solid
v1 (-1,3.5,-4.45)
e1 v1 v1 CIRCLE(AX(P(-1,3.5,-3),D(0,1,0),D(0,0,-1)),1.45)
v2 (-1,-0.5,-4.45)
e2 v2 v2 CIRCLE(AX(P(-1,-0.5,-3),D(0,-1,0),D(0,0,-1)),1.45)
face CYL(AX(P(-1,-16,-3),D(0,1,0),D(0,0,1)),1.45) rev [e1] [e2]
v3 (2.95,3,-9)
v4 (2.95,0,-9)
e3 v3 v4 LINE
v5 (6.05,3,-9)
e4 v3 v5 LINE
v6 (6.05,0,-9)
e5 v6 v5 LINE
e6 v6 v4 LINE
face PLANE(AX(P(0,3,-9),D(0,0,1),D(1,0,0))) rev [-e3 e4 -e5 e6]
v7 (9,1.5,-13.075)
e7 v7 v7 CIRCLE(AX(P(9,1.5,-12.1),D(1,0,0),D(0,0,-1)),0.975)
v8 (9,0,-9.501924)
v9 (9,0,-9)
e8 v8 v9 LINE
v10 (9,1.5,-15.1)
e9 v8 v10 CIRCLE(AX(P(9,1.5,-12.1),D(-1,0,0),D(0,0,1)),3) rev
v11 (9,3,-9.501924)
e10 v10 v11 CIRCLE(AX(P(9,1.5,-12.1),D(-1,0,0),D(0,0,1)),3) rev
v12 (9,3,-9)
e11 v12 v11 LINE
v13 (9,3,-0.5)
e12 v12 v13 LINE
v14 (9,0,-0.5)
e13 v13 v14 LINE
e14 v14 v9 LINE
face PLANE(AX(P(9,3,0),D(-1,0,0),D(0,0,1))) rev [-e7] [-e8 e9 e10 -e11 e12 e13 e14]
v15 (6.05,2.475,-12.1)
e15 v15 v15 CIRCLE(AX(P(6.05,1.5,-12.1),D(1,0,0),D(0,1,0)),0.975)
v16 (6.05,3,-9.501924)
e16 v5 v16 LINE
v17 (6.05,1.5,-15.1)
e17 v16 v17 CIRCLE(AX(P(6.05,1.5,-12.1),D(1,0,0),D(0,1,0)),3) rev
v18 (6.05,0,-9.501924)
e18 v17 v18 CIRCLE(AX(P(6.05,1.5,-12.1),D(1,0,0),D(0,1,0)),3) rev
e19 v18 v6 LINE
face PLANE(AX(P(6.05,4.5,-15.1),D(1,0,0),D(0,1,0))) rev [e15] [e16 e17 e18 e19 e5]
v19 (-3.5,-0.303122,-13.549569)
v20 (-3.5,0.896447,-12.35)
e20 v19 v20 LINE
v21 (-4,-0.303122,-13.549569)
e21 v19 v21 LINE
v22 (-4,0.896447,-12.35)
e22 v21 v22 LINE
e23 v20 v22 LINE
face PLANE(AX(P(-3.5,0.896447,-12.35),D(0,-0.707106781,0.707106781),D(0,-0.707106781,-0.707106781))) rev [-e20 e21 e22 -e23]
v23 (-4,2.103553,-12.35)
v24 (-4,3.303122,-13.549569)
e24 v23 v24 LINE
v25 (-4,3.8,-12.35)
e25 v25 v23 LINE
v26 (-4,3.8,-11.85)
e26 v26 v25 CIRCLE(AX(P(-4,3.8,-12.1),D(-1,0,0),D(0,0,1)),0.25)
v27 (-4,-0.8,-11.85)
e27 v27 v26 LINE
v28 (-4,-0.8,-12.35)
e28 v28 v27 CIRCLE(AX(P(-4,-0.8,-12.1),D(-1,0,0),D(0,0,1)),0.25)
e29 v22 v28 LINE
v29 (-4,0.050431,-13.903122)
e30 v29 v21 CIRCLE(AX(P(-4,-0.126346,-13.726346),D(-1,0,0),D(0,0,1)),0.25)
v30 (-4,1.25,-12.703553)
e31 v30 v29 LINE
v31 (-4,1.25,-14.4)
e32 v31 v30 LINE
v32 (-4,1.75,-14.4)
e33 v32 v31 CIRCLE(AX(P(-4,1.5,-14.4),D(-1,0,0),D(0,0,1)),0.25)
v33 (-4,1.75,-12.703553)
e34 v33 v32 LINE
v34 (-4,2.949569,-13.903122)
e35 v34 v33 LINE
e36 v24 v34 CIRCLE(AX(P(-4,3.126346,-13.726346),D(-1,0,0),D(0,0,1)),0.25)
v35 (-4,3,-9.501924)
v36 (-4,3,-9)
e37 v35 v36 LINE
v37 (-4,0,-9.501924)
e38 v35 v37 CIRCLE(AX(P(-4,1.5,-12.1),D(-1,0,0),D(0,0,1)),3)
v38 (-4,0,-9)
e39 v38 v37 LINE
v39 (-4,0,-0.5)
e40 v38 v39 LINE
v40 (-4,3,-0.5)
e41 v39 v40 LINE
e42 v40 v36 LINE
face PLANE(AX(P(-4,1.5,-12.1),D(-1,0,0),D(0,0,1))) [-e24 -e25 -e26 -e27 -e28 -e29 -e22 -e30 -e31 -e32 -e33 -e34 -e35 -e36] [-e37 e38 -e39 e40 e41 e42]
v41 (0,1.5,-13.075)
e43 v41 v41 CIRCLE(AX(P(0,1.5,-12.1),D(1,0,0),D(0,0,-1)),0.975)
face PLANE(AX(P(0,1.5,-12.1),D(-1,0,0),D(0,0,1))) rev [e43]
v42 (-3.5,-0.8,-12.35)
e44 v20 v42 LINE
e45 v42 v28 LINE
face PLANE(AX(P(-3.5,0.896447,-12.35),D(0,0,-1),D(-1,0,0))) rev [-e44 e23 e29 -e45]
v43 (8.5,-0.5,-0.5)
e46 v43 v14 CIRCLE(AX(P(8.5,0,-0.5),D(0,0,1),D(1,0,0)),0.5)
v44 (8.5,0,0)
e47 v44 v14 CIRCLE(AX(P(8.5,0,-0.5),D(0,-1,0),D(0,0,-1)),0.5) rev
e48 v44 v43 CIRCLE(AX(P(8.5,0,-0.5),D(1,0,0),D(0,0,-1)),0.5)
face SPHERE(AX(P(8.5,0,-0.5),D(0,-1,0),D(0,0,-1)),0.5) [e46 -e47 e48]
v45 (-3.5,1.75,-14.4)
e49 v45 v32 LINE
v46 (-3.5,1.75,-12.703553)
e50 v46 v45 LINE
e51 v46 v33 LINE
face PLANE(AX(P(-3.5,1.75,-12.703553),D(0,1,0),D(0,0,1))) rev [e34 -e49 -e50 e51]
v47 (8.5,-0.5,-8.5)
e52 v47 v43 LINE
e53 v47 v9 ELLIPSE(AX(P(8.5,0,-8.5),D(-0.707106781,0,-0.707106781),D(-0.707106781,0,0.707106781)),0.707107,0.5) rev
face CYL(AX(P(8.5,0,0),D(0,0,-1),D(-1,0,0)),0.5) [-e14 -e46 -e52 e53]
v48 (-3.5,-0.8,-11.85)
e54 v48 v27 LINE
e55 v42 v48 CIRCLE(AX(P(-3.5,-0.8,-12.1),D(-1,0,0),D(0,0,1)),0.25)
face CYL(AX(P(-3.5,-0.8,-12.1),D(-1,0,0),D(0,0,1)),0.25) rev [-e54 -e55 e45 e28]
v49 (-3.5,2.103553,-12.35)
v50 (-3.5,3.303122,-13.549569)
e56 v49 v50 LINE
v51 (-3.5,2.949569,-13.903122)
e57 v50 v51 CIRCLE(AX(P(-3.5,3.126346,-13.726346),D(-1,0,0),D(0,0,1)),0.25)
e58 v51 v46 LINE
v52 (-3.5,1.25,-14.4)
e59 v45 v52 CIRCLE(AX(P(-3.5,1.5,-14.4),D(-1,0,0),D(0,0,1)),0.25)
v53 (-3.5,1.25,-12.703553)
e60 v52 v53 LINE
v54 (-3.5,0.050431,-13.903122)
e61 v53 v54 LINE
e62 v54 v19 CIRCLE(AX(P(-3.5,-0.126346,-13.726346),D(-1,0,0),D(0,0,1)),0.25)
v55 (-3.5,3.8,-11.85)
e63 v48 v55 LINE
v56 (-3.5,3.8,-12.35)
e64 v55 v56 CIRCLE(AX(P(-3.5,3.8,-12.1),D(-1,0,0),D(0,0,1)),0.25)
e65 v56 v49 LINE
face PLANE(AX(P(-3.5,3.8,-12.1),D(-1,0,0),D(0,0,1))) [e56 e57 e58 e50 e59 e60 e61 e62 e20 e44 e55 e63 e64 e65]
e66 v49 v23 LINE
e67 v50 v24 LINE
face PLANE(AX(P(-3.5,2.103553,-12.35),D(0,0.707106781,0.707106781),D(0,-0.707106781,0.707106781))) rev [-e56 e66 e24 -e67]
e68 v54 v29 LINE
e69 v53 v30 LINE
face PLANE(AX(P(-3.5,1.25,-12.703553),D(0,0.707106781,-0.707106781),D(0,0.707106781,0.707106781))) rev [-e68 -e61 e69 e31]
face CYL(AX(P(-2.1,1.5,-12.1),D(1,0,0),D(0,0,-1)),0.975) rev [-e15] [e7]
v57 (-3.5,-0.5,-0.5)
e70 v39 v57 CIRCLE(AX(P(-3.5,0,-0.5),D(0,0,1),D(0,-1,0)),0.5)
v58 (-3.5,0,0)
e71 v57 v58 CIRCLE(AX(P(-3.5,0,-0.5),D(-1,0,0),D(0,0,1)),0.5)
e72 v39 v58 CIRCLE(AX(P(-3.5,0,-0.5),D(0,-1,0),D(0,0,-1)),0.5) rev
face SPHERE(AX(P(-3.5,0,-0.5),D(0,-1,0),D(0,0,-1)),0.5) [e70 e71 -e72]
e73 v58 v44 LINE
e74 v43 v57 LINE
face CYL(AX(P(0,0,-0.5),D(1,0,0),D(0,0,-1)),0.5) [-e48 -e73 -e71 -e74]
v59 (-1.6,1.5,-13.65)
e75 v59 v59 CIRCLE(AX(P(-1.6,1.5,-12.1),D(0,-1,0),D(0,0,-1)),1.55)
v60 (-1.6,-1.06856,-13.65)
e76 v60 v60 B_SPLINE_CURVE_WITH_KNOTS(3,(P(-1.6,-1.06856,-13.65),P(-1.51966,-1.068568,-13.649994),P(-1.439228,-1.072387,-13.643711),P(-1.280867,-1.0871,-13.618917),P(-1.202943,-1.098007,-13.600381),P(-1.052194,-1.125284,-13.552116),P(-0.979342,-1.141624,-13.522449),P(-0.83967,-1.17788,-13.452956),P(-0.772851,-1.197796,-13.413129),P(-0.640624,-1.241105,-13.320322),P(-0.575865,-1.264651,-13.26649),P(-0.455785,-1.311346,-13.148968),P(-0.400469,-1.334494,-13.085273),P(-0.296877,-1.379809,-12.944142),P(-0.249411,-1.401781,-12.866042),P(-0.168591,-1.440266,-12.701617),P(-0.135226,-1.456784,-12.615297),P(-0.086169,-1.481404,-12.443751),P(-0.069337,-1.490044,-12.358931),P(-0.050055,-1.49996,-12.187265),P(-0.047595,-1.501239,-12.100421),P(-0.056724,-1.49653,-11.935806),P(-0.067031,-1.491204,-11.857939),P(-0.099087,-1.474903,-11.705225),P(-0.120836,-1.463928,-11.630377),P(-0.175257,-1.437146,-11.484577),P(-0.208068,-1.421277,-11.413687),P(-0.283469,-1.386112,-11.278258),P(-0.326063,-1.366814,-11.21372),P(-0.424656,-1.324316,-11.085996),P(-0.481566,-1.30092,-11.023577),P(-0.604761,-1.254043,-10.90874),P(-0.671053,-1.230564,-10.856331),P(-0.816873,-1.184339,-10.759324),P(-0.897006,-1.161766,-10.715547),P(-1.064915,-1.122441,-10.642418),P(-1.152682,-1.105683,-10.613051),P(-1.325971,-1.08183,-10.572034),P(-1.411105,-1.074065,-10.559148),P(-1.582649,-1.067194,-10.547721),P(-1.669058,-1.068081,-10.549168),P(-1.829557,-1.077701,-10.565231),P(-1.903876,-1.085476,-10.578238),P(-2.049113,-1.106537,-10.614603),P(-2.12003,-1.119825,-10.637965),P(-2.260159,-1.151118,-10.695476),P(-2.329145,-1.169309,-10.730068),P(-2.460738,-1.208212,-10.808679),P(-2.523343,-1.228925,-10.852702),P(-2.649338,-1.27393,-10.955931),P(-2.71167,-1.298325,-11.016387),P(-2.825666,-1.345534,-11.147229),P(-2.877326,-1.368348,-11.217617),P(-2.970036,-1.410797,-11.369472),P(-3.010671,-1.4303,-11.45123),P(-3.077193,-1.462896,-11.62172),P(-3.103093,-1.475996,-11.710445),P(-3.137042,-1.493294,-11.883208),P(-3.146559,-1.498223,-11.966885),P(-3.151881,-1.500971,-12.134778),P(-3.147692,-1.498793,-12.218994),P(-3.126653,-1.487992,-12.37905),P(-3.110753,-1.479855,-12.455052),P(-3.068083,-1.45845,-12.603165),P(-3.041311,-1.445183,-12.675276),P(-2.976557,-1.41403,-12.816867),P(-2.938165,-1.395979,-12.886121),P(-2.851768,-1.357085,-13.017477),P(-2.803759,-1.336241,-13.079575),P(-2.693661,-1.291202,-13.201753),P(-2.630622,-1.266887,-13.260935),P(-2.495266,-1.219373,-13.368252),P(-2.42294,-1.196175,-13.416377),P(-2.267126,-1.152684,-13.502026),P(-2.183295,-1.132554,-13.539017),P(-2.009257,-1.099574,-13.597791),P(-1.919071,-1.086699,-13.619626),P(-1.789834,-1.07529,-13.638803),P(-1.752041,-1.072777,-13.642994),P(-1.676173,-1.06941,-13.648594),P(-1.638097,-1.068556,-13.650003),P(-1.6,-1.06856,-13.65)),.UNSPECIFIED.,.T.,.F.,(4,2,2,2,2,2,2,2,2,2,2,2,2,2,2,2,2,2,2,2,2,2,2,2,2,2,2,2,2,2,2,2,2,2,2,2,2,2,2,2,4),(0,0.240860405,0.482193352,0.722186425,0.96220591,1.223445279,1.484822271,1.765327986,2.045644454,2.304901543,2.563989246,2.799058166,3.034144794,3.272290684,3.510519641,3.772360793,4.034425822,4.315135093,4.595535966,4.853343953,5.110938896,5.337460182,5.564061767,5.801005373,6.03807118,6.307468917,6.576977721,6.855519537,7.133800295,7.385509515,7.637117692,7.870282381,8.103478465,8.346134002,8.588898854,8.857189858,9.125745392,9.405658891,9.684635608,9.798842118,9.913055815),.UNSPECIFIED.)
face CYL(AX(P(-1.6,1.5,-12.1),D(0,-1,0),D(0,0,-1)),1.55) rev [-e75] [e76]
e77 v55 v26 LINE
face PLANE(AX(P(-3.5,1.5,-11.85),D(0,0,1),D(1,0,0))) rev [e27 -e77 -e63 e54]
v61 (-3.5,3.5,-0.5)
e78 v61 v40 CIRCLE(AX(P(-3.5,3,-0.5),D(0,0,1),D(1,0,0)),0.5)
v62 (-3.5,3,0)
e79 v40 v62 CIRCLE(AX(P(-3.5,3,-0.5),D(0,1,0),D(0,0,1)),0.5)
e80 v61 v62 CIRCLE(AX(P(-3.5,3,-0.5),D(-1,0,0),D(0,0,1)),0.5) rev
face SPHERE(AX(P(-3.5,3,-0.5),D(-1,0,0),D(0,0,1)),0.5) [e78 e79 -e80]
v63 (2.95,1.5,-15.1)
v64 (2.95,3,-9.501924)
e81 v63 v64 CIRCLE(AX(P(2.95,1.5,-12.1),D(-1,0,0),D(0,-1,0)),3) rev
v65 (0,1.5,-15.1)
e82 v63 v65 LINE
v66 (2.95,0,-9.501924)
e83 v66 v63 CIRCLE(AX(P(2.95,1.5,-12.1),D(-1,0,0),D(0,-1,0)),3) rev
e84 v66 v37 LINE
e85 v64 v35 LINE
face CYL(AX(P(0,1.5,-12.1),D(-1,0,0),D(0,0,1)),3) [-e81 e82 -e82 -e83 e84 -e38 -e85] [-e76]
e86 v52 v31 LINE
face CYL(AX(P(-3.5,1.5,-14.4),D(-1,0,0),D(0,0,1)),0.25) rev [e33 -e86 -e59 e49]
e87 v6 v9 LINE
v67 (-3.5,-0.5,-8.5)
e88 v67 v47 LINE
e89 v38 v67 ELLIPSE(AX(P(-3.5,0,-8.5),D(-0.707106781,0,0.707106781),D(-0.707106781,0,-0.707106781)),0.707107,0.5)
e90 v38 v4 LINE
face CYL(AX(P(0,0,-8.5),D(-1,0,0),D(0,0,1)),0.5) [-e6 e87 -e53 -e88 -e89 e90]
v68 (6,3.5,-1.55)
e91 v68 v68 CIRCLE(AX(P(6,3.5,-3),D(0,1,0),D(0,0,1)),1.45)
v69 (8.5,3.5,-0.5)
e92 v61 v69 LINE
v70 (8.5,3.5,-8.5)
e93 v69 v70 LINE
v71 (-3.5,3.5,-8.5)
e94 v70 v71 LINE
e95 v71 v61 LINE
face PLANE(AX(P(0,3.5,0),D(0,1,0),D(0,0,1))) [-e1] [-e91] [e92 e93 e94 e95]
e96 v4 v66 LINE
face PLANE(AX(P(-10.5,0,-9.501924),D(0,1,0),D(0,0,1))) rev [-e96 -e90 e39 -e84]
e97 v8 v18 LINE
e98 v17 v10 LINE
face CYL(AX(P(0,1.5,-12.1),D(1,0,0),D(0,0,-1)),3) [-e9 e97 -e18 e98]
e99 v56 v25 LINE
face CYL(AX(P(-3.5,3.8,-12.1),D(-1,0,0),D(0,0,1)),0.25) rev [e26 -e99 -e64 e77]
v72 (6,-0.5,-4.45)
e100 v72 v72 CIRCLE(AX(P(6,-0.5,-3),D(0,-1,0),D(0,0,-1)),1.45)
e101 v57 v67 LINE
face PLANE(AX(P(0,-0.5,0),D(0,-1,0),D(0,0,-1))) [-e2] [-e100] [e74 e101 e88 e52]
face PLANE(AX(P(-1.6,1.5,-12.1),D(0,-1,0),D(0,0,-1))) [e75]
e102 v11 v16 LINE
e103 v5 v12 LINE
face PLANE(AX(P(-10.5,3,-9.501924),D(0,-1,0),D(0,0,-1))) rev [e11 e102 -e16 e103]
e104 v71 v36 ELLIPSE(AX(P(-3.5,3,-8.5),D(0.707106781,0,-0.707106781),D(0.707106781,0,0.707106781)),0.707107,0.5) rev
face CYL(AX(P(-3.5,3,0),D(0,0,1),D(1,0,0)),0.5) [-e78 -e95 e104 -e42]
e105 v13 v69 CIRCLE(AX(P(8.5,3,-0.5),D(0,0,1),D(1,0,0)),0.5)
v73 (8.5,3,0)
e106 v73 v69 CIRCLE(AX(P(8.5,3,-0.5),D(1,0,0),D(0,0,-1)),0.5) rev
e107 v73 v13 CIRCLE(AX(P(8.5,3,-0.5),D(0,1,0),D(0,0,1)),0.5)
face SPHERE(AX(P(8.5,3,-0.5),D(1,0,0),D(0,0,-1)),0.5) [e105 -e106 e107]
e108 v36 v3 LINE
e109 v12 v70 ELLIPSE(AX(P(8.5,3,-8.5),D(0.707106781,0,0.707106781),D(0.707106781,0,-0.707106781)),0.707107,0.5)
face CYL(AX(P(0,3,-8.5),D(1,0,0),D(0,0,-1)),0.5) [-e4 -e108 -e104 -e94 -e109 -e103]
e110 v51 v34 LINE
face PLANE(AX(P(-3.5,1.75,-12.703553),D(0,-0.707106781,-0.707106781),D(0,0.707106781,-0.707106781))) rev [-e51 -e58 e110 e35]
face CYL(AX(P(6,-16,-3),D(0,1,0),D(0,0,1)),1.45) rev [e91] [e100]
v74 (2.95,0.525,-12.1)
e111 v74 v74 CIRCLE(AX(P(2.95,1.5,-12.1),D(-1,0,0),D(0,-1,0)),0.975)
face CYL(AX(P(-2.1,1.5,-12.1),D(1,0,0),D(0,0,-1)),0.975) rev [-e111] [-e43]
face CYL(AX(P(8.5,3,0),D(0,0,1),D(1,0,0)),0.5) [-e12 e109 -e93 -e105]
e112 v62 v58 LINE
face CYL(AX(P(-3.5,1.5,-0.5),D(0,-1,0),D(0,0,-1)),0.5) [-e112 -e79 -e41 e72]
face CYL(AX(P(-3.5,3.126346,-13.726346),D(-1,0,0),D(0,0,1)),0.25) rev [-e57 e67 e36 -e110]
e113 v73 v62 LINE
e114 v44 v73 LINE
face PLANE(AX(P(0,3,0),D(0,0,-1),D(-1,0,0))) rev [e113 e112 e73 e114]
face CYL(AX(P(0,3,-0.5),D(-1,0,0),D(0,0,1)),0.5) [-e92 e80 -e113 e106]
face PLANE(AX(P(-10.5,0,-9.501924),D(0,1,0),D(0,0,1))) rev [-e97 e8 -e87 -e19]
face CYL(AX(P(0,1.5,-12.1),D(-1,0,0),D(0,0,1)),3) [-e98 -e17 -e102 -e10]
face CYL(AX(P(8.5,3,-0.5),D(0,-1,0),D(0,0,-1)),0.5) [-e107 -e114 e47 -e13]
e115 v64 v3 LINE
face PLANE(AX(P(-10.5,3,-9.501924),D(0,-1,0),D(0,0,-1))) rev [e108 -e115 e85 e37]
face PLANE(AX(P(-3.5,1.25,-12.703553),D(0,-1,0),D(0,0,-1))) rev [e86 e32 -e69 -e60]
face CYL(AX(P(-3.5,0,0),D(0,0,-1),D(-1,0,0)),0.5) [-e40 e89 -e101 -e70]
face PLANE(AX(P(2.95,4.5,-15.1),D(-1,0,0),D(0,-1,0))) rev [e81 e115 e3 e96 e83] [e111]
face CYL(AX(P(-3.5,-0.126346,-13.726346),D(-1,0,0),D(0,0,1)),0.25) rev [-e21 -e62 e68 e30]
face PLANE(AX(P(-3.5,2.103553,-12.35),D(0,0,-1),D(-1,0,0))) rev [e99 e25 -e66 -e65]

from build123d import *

# Parameters (mm, degrees)
SKETCH1_W           = 9
SKETCH1_H           = 9
BOSS_EXTRUDE1_DEPTH = 3
SKETCH2_W           = 2.95
SKETCH2_H           = 6
BOSS_EXTRUDE2_DEPTH = 6.1
FILLET1_R           = 3
SKETCH3_R           = 0.975
CUT_EXTRUDE1_DEPTH  = 11.1
CUT_EXTRUDE3_DEPTH  = 21.1
BOSS_EXTRUDE3_START = 4
SKETCH5_R           = 3
BOSS_EXTRUDE3_DEPTH = 4
SKETCH8_R           = 1.55
CUT_EXTRUDE4_DEPTH  = 3
CUT_EXTRUDE5_DEPTH  = 0.5
BOSS_EXTRUDE4_START = 4
BOSS_EXTRUDE4_DEPTH = 4
BOSS_EXTRUDE5_DEPTH = 0.5
BOSS_EXTRUDE6_DEPTH = 0.5
SKETCH15_W          = 0.501923789
SKETCH15_H          = 0.5
CUT_EXTRUDE6_DEPTH  = 19.5
SKETCH16_R          = 1.45
CUT_EXTRUDE7_DEPTH  = 19.5
FILLET2_R           = 0.5


with BuildPart() as part:
    # Sketch1 → Boss-Extrude1 (new body)
    with BuildSketch(Plane(origin=(0, 0, 0), x_dir=(1, 0, 0), z_dir=(0, 1, 0))):
        with Locations((4.5, 4.5)):
            Rectangle(SKETCH1_W, SKETCH1_H)
    extrude(amount=BOSS_EXTRUDE1_DEPTH)

    # Sketch2 → Boss-Extrude2 (add)
    with BuildSketch(Plane(origin=(0, 0, -9), x_dir=(-1, 0, 0), z_dir=(0, 0, -1))):
        with Locations((-7.525, 1.5)):
            Rectangle(SKETCH2_W, SKETCH2_H)
        with Locations((-1.475, 1.5)):
            Rectangle(SKETCH2_W, SKETCH2_H)
    extrude(amount=BOSS_EXTRUDE2_DEPTH)

    # Fillet1
    fillet1_edges = [part.edges().sort_by_distance(p)[0] for p in [
        (1.475, 4.5, -15.1),
        (1.475, -1.5, -15.1),
        (7.525, -1.5, -15.1),
        (7.525, 4.5, -15.1),
    ]]
    fillet(fillet1_edges, radius=FILLET1_R - 0.0001)  # a hair under: the kernel refuses the full size

    # Sketch3 → Cut-Extrude1 (cut)
    with BuildSketch(Plane(origin=(9, 0, 0), x_dir=(0, 0, -1), z_dir=(1, 0, 0))):
        with Locations((12.1, 1.5)):
            Circle(SKETCH3_R)
    extrude(amount=-CUT_EXTRUDE1_DEPTH, mode=Mode.SUBTRACT)

    # Sketch6 → Cut-Extrude3 (cut)
    with BuildSketch(Plane.ZY):
        with BuildLine():
            Line((-12.1, 4.5), (-9, 4.5))
            Line((-9, 4.5), (-9, 3))
            Line((-9, 3), (-9.501923789, 3))
            ThreePointArc((-9.501923789, 3), (-10.6, 4.098076211), (-12.1, 4.5))
        make_face()
        with BuildLine():
            Line((-12.1, -1.5), (-9, -1.5))
            Line((-9, -1.5), (-9, 0))
            Line((-9, 0), (-9.501923789, 0))
            ThreePointArc((-9.501923789, 0), (-10.6, -1.098076211), (-12.1, -1.5))
        make_face()
    extrude(amount=-CUT_EXTRUDE3_DEPTH, mode=Mode.SUBTRACT)

    # Sketch5 → Boss-Extrude3 (add)
    with BuildSketch(Plane.ZY.offset(BOSS_EXTRUDE3_START)):
        with Locations((-12.1, 1.5)):
            Circle(SKETCH5_R)
    extrude(amount=-BOSS_EXTRUDE3_DEPTH)

    # Sketch8 → Cut-Extrude4 (cut)
    with BuildSketch(Plane(origin=(0, -1.5, 0), x_dir=(-1, 0, 0), z_dir=(0, -1, 0))):
        with Locations(Location((1.6, 12.1, 0), (0, 0, 90))):
            Circle(SKETCH8_R)
    extrude(amount=-CUT_EXTRUDE4_DEPTH, mode=Mode.SUBTRACT)

    # Sketch9 → Cut-Extrude5 (cut)
    with BuildSketch(Plane.ZY.offset(4)):
        with BuildLine():
            Line((-11.85, 1.5), (-11.85, -0.8))
            ThreePointArc((-11.85, -0.8), (-12.1, -1.05), (-12.35, -0.8))
            Line((-12.35, -0.8), (-12.35, 0.896446609))
            Line((-12.35, 0.896446609), (-13.549568901, -0.303122292))
            ThreePointArc((-13.549568901, -0.303122292), (-13.903122292, -0.303122292), (-13.903122292, 0.050431099))
            Line((-13.903122292, 0.050431099), (-12.703553391, 1.25))
            Line((-12.703553391, 1.25), (-14.4, 1.25))
            ThreePointArc((-14.4, 1.25), (-14.65, 1.5), (-14.4, 1.75))
            Line((-14.4, 1.75), (-12.703553391, 1.75))
            Line((-12.703553391, 1.75), (-13.903122292, 2.949568901))
            ThreePointArc((-13.903122292, 2.949568901), (-13.903122292, 3.303122292), (-13.549568901, 3.303122292))
            Line((-13.549568901, 3.303122292), (-12.35, 2.103553391))
            Line((-12.35, 2.103553391), (-12.35, 3.8))
            ThreePointArc((-12.35, 3.8), (-12.1, 4.05), (-11.85, 3.8))
            Line((-11.85, 3.8), (-11.85, 1.5))
        make_face()
    extrude(amount=-CUT_EXTRUDE5_DEPTH, mode=Mode.SUBTRACT)

    # Sketch10 → Boss-Extrude4 (add)
    with BuildSketch(Plane.ZY.offset(BOSS_EXTRUDE4_START)):
        with BuildLine():
            Line((-9.501923789, 0), (0, 0))
            Line((0, 0), (0, 3))
            Line((0, 3), (-9.501923789, 3))
            ThreePointArc((-9.501923789, 3), (-9.1, 1.5), (-9.501923789, 0))
        make_face()
    extrude(amount=-BOSS_EXTRUDE4_DEPTH)

    # Sketch12 → Boss-Extrude5 (add)
    with BuildSketch(Plane.XZ):
        Polygon((9, 0), (-4, 0), (-4, -9.501923789), (2.95, -9.501923789), (2.95, -9), (6.05, -9), (6.05, -9.501923789), (9, -9.501923789), align=None)
    extrude(amount=BOSS_EXTRUDE5_DEPTH)

    # Sketch13 → Boss-Extrude6 (add)
    with BuildSketch(Plane(origin=(0, 3, 0), x_dir=(1, 0, 0), z_dir=(0, 1, 0))):
        Polygon((2.95, 9.501923789), (-4, 9.501923789), (-4, 0), (9, 0), (9, 9.501923789), (6.05, 9.501923789), (6.05, 9), (2.95, 9), align=None)
    extrude(amount=BOSS_EXTRUDE6_DEPTH)

    # Sketch15 → Cut-Extrude6 (cut)
    with BuildSketch(Plane(origin=(9, 0, 0), x_dir=(0, 0, -1), z_dir=(1, 0, 0))):
        with Locations((9.250961895, 3.25)):
            Rectangle(SKETCH15_W, SKETCH15_H)
        with Locations((9.250961895, -0.25)):
            Rectangle(SKETCH15_W, SKETCH15_H)
    extrude(amount=-CUT_EXTRUDE6_DEPTH, mode=Mode.SUBTRACT)

    # Sketch16 → Cut-Extrude7 (cut)
    with BuildSketch(Plane(origin=(0, 3.5, 0), x_dir=(1, 0, 0), z_dir=(0, 1, 0))):
        with Locations(Location((6, 3, 0), (0, 0, 270))):
            Circle(SKETCH16_R)
        with Locations(Location((-1, 3, 0), (0, 0, 90))):
            Circle(SKETCH16_R)
    extrude(amount=-CUT_EXTRUDE7_DEPTH, mode=Mode.SUBTRACT)

    # Fillet2
    fillet2_edges = [part.edges().sort_by_distance(p)[0] for p in [
        (2.5, 3.5, 0),
        (9, 1.25, 0),
        (2.5, -0.5, 0),
        (-4, 1.5, 0),
        (-4, -0.5, -4.5),
        (-4, 3.5, -4.5),
        (9, 3.5, -4.5),
        (9, -0.5, -4.5),
        (2.5, 3.5, -9),
        (2.5, -0.5, -9),
    ]]
    fillet(fillet2_edges, radius=FILLET2_R - 0.0001)  # a hair under: the kernel refuses the full size


solid = part.part
